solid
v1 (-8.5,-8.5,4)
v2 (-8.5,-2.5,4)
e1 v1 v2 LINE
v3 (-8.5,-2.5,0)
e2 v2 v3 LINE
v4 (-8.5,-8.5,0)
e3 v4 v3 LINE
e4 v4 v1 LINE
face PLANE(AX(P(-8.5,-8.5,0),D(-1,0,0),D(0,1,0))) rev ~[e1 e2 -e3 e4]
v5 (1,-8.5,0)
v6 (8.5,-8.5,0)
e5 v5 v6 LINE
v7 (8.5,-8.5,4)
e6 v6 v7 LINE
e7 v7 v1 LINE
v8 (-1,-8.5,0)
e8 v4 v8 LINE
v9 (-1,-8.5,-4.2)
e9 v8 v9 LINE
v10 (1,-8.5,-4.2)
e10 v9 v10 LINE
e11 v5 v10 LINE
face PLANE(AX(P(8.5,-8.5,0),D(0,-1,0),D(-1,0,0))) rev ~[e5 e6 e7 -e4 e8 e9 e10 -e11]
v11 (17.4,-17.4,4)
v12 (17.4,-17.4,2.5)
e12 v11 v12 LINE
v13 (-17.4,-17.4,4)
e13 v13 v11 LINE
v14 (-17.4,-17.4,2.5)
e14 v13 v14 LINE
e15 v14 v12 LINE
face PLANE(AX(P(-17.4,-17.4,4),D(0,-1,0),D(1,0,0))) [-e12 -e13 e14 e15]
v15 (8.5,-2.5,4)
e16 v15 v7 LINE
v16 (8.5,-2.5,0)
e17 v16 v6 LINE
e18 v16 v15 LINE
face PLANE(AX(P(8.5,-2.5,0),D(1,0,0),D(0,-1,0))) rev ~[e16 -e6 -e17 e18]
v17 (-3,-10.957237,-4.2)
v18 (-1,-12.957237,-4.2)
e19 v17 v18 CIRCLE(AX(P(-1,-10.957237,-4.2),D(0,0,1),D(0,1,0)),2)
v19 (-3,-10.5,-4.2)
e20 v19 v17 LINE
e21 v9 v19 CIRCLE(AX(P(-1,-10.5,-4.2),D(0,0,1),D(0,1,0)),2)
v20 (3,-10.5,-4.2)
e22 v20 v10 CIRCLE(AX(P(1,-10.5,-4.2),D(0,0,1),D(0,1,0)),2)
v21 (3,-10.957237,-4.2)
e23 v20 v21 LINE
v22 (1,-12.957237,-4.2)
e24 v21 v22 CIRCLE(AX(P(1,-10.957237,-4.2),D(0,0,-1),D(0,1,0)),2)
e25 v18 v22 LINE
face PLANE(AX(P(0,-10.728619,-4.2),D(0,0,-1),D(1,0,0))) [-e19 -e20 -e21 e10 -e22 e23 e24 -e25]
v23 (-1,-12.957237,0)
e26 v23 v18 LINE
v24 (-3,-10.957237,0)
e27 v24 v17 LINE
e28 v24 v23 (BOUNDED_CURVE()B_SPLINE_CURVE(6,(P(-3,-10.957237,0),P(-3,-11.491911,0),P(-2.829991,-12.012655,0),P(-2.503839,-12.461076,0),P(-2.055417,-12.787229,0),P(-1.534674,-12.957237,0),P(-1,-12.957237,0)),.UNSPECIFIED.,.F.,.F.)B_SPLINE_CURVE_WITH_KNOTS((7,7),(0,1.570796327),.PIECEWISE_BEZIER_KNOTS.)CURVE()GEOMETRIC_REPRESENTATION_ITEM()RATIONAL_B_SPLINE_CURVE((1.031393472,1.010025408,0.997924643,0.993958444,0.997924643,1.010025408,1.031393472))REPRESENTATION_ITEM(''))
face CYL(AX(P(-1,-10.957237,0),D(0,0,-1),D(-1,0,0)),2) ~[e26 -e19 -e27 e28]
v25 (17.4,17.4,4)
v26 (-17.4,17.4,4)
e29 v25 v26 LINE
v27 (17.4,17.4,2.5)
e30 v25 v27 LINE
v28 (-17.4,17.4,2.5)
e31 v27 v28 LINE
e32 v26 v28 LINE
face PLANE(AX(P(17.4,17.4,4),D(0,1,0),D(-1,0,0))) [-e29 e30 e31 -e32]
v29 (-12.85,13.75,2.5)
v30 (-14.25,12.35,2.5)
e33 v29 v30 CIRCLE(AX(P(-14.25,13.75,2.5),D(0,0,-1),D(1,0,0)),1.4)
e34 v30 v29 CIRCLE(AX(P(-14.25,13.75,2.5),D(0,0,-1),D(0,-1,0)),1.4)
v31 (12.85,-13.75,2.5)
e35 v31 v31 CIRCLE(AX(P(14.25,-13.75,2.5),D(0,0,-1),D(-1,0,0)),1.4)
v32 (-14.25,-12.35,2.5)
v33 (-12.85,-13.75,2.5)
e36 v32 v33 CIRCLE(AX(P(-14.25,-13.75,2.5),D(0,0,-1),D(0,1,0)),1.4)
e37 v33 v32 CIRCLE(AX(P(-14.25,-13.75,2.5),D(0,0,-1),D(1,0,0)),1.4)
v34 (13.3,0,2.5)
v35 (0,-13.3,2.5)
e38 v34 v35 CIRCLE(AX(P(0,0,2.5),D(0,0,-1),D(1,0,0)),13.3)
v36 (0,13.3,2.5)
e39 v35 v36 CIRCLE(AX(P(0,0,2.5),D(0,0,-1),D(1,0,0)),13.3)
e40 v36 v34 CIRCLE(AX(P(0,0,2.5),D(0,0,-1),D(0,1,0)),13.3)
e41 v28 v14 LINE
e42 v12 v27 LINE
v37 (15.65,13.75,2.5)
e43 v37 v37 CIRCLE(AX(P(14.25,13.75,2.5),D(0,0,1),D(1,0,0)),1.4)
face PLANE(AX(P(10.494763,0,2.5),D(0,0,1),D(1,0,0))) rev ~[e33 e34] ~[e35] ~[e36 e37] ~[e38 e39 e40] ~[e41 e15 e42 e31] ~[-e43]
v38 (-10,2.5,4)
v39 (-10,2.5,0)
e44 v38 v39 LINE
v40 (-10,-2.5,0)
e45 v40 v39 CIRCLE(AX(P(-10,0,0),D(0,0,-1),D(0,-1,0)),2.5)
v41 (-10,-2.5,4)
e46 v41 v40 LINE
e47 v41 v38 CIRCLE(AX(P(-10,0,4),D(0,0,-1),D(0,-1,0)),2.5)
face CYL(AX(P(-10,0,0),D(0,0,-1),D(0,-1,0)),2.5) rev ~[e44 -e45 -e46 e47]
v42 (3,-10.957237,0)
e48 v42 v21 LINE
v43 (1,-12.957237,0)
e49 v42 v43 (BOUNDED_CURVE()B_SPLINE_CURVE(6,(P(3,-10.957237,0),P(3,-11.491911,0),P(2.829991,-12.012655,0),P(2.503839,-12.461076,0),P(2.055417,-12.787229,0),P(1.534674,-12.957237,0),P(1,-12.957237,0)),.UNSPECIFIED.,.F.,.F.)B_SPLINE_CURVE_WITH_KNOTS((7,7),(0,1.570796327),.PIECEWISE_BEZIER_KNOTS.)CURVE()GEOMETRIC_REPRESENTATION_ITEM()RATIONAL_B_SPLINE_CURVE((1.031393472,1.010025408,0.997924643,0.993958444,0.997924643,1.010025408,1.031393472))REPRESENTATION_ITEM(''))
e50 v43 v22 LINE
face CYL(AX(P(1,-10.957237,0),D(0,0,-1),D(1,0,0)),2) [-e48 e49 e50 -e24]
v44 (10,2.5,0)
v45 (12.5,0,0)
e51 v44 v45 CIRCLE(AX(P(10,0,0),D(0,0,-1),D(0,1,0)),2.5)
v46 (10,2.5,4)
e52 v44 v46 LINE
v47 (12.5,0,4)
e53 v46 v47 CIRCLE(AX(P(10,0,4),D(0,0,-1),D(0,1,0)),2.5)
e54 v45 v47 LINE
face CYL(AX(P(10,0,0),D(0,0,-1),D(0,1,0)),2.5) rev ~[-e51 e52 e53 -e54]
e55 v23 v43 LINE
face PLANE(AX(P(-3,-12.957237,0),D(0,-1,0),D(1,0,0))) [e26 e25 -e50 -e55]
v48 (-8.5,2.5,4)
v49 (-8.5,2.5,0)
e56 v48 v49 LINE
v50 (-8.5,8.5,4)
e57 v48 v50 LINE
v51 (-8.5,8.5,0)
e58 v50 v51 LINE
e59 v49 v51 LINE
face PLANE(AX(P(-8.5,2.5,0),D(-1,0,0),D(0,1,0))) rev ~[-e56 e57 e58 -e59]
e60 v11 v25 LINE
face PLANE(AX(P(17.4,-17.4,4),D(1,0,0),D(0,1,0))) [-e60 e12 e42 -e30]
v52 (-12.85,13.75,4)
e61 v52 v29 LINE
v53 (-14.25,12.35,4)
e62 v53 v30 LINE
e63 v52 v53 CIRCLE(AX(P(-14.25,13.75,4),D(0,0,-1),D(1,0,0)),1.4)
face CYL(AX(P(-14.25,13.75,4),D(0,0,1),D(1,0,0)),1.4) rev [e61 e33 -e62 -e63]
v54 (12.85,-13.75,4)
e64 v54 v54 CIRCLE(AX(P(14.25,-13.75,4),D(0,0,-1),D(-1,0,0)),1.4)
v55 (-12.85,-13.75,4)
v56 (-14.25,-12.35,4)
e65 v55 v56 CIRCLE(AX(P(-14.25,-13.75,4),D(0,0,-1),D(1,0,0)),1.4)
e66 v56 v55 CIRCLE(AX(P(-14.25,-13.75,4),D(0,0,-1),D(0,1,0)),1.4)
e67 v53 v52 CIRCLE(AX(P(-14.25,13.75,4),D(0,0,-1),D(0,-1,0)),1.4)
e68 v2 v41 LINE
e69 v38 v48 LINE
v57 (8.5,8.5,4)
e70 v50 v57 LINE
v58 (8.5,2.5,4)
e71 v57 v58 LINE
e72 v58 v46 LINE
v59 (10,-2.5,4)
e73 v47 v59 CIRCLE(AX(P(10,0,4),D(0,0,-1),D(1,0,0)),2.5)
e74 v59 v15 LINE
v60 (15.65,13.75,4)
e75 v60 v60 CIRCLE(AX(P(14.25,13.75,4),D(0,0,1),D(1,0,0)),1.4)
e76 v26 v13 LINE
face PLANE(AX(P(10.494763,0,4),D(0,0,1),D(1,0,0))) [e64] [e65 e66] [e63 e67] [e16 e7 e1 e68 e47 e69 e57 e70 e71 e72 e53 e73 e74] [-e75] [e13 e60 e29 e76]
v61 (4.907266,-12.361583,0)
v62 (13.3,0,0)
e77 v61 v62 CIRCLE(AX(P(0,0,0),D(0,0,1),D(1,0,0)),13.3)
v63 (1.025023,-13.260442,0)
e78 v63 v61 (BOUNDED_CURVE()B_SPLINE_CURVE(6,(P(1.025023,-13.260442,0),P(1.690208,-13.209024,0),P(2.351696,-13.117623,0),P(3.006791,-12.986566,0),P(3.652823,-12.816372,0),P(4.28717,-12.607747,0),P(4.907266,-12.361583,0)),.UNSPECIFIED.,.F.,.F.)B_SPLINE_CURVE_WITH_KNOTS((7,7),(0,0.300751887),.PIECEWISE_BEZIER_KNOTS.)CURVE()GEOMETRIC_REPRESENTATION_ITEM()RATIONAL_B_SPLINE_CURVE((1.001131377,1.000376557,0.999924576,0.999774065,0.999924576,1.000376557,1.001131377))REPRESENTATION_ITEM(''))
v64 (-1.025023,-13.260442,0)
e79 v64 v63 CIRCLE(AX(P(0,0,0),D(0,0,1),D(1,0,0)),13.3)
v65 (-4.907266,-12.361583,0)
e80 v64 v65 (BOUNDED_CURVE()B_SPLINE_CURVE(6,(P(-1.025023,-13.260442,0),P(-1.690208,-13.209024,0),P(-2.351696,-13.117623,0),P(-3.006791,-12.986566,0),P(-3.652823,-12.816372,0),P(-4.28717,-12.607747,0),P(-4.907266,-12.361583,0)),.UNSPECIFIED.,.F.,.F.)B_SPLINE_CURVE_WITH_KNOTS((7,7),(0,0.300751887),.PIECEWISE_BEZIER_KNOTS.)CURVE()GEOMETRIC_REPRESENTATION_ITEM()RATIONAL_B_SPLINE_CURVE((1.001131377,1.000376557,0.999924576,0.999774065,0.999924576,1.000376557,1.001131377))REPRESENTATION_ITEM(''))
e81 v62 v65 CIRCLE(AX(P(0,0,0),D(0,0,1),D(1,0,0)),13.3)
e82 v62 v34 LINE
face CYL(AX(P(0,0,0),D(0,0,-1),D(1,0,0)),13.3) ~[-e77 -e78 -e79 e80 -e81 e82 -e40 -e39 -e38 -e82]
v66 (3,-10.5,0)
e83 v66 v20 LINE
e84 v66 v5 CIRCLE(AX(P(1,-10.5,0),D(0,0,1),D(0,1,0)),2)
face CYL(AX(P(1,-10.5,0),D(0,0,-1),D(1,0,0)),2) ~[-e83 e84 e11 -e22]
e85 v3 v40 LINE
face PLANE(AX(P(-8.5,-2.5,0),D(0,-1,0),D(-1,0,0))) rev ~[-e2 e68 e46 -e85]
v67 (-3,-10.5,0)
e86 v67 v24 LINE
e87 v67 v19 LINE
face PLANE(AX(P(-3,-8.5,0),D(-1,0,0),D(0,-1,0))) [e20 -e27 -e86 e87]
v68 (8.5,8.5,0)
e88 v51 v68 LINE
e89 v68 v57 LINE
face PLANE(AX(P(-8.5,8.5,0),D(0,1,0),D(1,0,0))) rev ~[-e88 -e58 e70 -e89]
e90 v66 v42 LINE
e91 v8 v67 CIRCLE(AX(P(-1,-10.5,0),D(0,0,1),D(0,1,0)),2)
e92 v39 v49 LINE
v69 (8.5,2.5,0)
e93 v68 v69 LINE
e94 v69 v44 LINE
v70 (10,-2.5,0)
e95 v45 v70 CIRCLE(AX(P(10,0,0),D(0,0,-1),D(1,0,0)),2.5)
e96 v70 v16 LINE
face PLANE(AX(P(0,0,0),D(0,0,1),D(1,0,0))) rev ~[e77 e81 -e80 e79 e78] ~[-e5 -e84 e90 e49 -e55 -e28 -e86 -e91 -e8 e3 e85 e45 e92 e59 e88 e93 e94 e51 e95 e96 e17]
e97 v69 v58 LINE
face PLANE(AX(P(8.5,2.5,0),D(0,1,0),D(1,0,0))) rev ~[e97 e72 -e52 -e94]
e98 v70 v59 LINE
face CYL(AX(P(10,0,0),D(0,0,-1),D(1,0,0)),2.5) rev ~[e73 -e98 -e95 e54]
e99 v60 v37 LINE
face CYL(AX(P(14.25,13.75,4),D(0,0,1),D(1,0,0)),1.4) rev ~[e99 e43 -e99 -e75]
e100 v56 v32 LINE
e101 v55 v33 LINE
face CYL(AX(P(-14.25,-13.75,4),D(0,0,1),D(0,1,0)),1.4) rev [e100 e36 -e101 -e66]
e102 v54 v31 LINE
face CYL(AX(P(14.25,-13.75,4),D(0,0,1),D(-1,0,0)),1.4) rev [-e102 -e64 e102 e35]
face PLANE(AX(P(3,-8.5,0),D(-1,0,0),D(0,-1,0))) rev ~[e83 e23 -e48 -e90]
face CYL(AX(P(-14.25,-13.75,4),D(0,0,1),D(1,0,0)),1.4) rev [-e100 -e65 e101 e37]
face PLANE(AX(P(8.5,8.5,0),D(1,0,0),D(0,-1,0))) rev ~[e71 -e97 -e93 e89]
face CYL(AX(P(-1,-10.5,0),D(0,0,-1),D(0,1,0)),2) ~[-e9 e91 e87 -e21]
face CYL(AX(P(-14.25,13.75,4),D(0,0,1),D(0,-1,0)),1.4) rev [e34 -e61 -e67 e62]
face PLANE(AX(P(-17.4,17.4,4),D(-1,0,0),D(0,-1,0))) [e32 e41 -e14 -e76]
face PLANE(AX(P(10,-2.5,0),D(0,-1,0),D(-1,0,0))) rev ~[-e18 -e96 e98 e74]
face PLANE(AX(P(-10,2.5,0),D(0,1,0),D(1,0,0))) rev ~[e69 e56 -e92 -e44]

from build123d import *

# Parameters (mm, degrees)
F0_R     = 13.3
F1_DEPTH = 4
F2_W     = 6
F2_H     = 4.4572373599
F3_DEPTH = 4.2
F4_R     = 2
F5_R     = 1.4
F6_DEPTH = 1.5


with BuildPart() as f1:
    # F0 (on Top) → F1 (new body)
    with BuildSketch(Plane.XY):
        Circle(F0_R)
        with BuildLine():
            Line((0, -8.5), (-8.5, -8.5))
            Line((-8.5, -8.5), (-8.5, -2.5))
            Line((-8.5, -2.5), (-10, -2.5))
            ThreePointArc((-10, -2.5), (-12.5, 0), (-10, 2.5))
            Line((-10, 2.5), (-8.5, 2.5))
            Line((-8.5, 2.5), (-8.5, 8.5))
            Line((-8.5, 8.5), (0, 8.5))
            Line((0, 8.5), (8.5, 8.5))
            Line((8.5, 8.5), (8.5, 2.5))
            Line((8.5, 2.5), (10, 2.5))
            ThreePointArc((10, 2.5), (11.767766953, 1.767766953), (12.5, 0))
            ThreePointArc((12.5, 0), (11.767766953, -1.767766953), (10, -2.5))
            Line((10, -2.5), (8.5, -2.5))
            Line((8.5, -2.5), (8.5, -8.5))
            Line((8.5, -8.5), (0, -8.5))
        make_face(mode=Mode.SUBTRACT)
    extrude(amount=F1_DEPTH)

    # F2 (on face) → F3 (join)
    with BuildSketch(Plane(origin=(0, 0, 0), x_dir=(1, 0, 0), z_dir=(0, 0, -1))):
        with Locations((0, 10.7286186799)):
            Rectangle(F2_W, F2_H)
    extrude(amount=F3_DEPTH)

    # F4
    f4_edges = [f1.edges().sort_by_distance(p)[0] for p in [
        (-3, -12.957237, -2.1),
        (-3, -8.5, -2.1),
        (3, -8.5, -2.1),
        (3, -12.957237, -2.1),
    ]]
    fillet(f4_edges, radius=F4_R)

    # F5 (on face) → F6 (join)
    with BuildSketch(Plane.XY.offset(4)):
        with BuildLine():
            ThreePointArc((0, 13.3), (9.4045201898, 9.4045201898), (13.3, 0))
            ThreePointArc((13.3, 0), (9.4045201898, -9.4045201898), (0, -13.3))
            Line((0, -13.3), (0, -13.75))
            Line((0, -13.75), (0, -17.4))
            Line((0, -17.4), (17.4, -17.4))
            Line((17.4, -17.4), (17.4, 17.4))
            Line((17.4, 17.4), (0, 17.4))
            Line((0, 17.4), (0, 13.3))
        make_face()
        with BuildLine():
            ThreePointArc((15.65, -13.75), (14.25, -15.15), (12.85, -13.75))
            ThreePointArc((12.85, -13.75), (14.25, -12.35), (15.65, -13.75))
        make_face(mode=Mode.SUBTRACT)
        with Locations((14.25, 13.75)):
            Circle(F5_R, mode=Mode.SUBTRACT)
        with BuildLine():
            Line((0, 8.5), (0, 13.3))
            ThreePointArc((0, 13.3), (-9.4045201898, 9.4045201898), (-13.3, 0))
            Line((-13.3, 0), (-12.5, 0))
            ThreePointArc((-12.5, 0), (-11.767766953, 1.767766953), (-10, 2.5))
            Line((-10, 2.5), (-8.5, 2.5))
            Line((-8.5, 2.5), (-8.5, 8.5))
            Line((-8.5, 8.5), (0, 8.5))
        make_face()
        with BuildLine():
            ThreePointArc((-13.3, 0), (-9.4045201898, 9.4045201898), (0, 13.3))
            Line((0, 13.3), (0, 17.4))
            Line((0, 17.4), (-17.4, 17.4))
            Line((-17.4, 17.4), (-17.4, -17.4))
            Line((-17.4, -17.4), (0, -17.4))
            Line((0, -17.4), (0, -13.75))
            Line((0, -13.75), (-12.85, -13.75))
            ThreePointArc((-12.85, -13.75), (-15.2399494937, -14.7399494937), (-14.25, -12.35))
            Line((-14.25, -12.35), (-14.25, 0))
            Line((-14.25, 0), (-13.3, 0))
        make_face()
        with BuildLine():
            ThreePointArc((-12.85, 13.75), (-13.2600505063, 12.7600505063), (-14.25, 12.35))
            ThreePointArc((-14.25, 12.35), (-15.2399494937, 14.7399494937), (-12.85, 13.75))
        make_face(mode=Mode.SUBTRACT)
        with BuildLine():
            Line((0, -13.75), (0, -13.3))
            ThreePointArc((0, -13.3), (-9.4045201898, -9.4045201898), (-13.3, 0))
            Line((-13.3, 0), (-14.25, 0))
            Line((-14.25, 0), (-14.25, -12.35))
            ThreePointArc((-14.25, -12.35), (-13.2600505063, -12.7600505063), (-12.85, -13.75))
            Line((-12.85, -13.75), (0, -13.75))
        make_face()
        with BuildLine():
            ThreePointArc((-13.3, 0), (-9.4045201898, -9.4045201898), (0, -13.3))
            Line((0, -13.3), (0, -8.5))
            Line((0, -8.5), (-8.5, -8.5))
            Line((-8.5, -8.5), (-8.5, -2.5))
            Line((-8.5, -2.5), (-10, -2.5))
            ThreePointArc((-10, -2.5), (-11.767766953, -1.767766953), (-12.5, 0))
            Line((-12.5, 0), (-13.3, 0))
        make_face()
    extrude(amount=-F6_DEPTH)


solid = f1.part
